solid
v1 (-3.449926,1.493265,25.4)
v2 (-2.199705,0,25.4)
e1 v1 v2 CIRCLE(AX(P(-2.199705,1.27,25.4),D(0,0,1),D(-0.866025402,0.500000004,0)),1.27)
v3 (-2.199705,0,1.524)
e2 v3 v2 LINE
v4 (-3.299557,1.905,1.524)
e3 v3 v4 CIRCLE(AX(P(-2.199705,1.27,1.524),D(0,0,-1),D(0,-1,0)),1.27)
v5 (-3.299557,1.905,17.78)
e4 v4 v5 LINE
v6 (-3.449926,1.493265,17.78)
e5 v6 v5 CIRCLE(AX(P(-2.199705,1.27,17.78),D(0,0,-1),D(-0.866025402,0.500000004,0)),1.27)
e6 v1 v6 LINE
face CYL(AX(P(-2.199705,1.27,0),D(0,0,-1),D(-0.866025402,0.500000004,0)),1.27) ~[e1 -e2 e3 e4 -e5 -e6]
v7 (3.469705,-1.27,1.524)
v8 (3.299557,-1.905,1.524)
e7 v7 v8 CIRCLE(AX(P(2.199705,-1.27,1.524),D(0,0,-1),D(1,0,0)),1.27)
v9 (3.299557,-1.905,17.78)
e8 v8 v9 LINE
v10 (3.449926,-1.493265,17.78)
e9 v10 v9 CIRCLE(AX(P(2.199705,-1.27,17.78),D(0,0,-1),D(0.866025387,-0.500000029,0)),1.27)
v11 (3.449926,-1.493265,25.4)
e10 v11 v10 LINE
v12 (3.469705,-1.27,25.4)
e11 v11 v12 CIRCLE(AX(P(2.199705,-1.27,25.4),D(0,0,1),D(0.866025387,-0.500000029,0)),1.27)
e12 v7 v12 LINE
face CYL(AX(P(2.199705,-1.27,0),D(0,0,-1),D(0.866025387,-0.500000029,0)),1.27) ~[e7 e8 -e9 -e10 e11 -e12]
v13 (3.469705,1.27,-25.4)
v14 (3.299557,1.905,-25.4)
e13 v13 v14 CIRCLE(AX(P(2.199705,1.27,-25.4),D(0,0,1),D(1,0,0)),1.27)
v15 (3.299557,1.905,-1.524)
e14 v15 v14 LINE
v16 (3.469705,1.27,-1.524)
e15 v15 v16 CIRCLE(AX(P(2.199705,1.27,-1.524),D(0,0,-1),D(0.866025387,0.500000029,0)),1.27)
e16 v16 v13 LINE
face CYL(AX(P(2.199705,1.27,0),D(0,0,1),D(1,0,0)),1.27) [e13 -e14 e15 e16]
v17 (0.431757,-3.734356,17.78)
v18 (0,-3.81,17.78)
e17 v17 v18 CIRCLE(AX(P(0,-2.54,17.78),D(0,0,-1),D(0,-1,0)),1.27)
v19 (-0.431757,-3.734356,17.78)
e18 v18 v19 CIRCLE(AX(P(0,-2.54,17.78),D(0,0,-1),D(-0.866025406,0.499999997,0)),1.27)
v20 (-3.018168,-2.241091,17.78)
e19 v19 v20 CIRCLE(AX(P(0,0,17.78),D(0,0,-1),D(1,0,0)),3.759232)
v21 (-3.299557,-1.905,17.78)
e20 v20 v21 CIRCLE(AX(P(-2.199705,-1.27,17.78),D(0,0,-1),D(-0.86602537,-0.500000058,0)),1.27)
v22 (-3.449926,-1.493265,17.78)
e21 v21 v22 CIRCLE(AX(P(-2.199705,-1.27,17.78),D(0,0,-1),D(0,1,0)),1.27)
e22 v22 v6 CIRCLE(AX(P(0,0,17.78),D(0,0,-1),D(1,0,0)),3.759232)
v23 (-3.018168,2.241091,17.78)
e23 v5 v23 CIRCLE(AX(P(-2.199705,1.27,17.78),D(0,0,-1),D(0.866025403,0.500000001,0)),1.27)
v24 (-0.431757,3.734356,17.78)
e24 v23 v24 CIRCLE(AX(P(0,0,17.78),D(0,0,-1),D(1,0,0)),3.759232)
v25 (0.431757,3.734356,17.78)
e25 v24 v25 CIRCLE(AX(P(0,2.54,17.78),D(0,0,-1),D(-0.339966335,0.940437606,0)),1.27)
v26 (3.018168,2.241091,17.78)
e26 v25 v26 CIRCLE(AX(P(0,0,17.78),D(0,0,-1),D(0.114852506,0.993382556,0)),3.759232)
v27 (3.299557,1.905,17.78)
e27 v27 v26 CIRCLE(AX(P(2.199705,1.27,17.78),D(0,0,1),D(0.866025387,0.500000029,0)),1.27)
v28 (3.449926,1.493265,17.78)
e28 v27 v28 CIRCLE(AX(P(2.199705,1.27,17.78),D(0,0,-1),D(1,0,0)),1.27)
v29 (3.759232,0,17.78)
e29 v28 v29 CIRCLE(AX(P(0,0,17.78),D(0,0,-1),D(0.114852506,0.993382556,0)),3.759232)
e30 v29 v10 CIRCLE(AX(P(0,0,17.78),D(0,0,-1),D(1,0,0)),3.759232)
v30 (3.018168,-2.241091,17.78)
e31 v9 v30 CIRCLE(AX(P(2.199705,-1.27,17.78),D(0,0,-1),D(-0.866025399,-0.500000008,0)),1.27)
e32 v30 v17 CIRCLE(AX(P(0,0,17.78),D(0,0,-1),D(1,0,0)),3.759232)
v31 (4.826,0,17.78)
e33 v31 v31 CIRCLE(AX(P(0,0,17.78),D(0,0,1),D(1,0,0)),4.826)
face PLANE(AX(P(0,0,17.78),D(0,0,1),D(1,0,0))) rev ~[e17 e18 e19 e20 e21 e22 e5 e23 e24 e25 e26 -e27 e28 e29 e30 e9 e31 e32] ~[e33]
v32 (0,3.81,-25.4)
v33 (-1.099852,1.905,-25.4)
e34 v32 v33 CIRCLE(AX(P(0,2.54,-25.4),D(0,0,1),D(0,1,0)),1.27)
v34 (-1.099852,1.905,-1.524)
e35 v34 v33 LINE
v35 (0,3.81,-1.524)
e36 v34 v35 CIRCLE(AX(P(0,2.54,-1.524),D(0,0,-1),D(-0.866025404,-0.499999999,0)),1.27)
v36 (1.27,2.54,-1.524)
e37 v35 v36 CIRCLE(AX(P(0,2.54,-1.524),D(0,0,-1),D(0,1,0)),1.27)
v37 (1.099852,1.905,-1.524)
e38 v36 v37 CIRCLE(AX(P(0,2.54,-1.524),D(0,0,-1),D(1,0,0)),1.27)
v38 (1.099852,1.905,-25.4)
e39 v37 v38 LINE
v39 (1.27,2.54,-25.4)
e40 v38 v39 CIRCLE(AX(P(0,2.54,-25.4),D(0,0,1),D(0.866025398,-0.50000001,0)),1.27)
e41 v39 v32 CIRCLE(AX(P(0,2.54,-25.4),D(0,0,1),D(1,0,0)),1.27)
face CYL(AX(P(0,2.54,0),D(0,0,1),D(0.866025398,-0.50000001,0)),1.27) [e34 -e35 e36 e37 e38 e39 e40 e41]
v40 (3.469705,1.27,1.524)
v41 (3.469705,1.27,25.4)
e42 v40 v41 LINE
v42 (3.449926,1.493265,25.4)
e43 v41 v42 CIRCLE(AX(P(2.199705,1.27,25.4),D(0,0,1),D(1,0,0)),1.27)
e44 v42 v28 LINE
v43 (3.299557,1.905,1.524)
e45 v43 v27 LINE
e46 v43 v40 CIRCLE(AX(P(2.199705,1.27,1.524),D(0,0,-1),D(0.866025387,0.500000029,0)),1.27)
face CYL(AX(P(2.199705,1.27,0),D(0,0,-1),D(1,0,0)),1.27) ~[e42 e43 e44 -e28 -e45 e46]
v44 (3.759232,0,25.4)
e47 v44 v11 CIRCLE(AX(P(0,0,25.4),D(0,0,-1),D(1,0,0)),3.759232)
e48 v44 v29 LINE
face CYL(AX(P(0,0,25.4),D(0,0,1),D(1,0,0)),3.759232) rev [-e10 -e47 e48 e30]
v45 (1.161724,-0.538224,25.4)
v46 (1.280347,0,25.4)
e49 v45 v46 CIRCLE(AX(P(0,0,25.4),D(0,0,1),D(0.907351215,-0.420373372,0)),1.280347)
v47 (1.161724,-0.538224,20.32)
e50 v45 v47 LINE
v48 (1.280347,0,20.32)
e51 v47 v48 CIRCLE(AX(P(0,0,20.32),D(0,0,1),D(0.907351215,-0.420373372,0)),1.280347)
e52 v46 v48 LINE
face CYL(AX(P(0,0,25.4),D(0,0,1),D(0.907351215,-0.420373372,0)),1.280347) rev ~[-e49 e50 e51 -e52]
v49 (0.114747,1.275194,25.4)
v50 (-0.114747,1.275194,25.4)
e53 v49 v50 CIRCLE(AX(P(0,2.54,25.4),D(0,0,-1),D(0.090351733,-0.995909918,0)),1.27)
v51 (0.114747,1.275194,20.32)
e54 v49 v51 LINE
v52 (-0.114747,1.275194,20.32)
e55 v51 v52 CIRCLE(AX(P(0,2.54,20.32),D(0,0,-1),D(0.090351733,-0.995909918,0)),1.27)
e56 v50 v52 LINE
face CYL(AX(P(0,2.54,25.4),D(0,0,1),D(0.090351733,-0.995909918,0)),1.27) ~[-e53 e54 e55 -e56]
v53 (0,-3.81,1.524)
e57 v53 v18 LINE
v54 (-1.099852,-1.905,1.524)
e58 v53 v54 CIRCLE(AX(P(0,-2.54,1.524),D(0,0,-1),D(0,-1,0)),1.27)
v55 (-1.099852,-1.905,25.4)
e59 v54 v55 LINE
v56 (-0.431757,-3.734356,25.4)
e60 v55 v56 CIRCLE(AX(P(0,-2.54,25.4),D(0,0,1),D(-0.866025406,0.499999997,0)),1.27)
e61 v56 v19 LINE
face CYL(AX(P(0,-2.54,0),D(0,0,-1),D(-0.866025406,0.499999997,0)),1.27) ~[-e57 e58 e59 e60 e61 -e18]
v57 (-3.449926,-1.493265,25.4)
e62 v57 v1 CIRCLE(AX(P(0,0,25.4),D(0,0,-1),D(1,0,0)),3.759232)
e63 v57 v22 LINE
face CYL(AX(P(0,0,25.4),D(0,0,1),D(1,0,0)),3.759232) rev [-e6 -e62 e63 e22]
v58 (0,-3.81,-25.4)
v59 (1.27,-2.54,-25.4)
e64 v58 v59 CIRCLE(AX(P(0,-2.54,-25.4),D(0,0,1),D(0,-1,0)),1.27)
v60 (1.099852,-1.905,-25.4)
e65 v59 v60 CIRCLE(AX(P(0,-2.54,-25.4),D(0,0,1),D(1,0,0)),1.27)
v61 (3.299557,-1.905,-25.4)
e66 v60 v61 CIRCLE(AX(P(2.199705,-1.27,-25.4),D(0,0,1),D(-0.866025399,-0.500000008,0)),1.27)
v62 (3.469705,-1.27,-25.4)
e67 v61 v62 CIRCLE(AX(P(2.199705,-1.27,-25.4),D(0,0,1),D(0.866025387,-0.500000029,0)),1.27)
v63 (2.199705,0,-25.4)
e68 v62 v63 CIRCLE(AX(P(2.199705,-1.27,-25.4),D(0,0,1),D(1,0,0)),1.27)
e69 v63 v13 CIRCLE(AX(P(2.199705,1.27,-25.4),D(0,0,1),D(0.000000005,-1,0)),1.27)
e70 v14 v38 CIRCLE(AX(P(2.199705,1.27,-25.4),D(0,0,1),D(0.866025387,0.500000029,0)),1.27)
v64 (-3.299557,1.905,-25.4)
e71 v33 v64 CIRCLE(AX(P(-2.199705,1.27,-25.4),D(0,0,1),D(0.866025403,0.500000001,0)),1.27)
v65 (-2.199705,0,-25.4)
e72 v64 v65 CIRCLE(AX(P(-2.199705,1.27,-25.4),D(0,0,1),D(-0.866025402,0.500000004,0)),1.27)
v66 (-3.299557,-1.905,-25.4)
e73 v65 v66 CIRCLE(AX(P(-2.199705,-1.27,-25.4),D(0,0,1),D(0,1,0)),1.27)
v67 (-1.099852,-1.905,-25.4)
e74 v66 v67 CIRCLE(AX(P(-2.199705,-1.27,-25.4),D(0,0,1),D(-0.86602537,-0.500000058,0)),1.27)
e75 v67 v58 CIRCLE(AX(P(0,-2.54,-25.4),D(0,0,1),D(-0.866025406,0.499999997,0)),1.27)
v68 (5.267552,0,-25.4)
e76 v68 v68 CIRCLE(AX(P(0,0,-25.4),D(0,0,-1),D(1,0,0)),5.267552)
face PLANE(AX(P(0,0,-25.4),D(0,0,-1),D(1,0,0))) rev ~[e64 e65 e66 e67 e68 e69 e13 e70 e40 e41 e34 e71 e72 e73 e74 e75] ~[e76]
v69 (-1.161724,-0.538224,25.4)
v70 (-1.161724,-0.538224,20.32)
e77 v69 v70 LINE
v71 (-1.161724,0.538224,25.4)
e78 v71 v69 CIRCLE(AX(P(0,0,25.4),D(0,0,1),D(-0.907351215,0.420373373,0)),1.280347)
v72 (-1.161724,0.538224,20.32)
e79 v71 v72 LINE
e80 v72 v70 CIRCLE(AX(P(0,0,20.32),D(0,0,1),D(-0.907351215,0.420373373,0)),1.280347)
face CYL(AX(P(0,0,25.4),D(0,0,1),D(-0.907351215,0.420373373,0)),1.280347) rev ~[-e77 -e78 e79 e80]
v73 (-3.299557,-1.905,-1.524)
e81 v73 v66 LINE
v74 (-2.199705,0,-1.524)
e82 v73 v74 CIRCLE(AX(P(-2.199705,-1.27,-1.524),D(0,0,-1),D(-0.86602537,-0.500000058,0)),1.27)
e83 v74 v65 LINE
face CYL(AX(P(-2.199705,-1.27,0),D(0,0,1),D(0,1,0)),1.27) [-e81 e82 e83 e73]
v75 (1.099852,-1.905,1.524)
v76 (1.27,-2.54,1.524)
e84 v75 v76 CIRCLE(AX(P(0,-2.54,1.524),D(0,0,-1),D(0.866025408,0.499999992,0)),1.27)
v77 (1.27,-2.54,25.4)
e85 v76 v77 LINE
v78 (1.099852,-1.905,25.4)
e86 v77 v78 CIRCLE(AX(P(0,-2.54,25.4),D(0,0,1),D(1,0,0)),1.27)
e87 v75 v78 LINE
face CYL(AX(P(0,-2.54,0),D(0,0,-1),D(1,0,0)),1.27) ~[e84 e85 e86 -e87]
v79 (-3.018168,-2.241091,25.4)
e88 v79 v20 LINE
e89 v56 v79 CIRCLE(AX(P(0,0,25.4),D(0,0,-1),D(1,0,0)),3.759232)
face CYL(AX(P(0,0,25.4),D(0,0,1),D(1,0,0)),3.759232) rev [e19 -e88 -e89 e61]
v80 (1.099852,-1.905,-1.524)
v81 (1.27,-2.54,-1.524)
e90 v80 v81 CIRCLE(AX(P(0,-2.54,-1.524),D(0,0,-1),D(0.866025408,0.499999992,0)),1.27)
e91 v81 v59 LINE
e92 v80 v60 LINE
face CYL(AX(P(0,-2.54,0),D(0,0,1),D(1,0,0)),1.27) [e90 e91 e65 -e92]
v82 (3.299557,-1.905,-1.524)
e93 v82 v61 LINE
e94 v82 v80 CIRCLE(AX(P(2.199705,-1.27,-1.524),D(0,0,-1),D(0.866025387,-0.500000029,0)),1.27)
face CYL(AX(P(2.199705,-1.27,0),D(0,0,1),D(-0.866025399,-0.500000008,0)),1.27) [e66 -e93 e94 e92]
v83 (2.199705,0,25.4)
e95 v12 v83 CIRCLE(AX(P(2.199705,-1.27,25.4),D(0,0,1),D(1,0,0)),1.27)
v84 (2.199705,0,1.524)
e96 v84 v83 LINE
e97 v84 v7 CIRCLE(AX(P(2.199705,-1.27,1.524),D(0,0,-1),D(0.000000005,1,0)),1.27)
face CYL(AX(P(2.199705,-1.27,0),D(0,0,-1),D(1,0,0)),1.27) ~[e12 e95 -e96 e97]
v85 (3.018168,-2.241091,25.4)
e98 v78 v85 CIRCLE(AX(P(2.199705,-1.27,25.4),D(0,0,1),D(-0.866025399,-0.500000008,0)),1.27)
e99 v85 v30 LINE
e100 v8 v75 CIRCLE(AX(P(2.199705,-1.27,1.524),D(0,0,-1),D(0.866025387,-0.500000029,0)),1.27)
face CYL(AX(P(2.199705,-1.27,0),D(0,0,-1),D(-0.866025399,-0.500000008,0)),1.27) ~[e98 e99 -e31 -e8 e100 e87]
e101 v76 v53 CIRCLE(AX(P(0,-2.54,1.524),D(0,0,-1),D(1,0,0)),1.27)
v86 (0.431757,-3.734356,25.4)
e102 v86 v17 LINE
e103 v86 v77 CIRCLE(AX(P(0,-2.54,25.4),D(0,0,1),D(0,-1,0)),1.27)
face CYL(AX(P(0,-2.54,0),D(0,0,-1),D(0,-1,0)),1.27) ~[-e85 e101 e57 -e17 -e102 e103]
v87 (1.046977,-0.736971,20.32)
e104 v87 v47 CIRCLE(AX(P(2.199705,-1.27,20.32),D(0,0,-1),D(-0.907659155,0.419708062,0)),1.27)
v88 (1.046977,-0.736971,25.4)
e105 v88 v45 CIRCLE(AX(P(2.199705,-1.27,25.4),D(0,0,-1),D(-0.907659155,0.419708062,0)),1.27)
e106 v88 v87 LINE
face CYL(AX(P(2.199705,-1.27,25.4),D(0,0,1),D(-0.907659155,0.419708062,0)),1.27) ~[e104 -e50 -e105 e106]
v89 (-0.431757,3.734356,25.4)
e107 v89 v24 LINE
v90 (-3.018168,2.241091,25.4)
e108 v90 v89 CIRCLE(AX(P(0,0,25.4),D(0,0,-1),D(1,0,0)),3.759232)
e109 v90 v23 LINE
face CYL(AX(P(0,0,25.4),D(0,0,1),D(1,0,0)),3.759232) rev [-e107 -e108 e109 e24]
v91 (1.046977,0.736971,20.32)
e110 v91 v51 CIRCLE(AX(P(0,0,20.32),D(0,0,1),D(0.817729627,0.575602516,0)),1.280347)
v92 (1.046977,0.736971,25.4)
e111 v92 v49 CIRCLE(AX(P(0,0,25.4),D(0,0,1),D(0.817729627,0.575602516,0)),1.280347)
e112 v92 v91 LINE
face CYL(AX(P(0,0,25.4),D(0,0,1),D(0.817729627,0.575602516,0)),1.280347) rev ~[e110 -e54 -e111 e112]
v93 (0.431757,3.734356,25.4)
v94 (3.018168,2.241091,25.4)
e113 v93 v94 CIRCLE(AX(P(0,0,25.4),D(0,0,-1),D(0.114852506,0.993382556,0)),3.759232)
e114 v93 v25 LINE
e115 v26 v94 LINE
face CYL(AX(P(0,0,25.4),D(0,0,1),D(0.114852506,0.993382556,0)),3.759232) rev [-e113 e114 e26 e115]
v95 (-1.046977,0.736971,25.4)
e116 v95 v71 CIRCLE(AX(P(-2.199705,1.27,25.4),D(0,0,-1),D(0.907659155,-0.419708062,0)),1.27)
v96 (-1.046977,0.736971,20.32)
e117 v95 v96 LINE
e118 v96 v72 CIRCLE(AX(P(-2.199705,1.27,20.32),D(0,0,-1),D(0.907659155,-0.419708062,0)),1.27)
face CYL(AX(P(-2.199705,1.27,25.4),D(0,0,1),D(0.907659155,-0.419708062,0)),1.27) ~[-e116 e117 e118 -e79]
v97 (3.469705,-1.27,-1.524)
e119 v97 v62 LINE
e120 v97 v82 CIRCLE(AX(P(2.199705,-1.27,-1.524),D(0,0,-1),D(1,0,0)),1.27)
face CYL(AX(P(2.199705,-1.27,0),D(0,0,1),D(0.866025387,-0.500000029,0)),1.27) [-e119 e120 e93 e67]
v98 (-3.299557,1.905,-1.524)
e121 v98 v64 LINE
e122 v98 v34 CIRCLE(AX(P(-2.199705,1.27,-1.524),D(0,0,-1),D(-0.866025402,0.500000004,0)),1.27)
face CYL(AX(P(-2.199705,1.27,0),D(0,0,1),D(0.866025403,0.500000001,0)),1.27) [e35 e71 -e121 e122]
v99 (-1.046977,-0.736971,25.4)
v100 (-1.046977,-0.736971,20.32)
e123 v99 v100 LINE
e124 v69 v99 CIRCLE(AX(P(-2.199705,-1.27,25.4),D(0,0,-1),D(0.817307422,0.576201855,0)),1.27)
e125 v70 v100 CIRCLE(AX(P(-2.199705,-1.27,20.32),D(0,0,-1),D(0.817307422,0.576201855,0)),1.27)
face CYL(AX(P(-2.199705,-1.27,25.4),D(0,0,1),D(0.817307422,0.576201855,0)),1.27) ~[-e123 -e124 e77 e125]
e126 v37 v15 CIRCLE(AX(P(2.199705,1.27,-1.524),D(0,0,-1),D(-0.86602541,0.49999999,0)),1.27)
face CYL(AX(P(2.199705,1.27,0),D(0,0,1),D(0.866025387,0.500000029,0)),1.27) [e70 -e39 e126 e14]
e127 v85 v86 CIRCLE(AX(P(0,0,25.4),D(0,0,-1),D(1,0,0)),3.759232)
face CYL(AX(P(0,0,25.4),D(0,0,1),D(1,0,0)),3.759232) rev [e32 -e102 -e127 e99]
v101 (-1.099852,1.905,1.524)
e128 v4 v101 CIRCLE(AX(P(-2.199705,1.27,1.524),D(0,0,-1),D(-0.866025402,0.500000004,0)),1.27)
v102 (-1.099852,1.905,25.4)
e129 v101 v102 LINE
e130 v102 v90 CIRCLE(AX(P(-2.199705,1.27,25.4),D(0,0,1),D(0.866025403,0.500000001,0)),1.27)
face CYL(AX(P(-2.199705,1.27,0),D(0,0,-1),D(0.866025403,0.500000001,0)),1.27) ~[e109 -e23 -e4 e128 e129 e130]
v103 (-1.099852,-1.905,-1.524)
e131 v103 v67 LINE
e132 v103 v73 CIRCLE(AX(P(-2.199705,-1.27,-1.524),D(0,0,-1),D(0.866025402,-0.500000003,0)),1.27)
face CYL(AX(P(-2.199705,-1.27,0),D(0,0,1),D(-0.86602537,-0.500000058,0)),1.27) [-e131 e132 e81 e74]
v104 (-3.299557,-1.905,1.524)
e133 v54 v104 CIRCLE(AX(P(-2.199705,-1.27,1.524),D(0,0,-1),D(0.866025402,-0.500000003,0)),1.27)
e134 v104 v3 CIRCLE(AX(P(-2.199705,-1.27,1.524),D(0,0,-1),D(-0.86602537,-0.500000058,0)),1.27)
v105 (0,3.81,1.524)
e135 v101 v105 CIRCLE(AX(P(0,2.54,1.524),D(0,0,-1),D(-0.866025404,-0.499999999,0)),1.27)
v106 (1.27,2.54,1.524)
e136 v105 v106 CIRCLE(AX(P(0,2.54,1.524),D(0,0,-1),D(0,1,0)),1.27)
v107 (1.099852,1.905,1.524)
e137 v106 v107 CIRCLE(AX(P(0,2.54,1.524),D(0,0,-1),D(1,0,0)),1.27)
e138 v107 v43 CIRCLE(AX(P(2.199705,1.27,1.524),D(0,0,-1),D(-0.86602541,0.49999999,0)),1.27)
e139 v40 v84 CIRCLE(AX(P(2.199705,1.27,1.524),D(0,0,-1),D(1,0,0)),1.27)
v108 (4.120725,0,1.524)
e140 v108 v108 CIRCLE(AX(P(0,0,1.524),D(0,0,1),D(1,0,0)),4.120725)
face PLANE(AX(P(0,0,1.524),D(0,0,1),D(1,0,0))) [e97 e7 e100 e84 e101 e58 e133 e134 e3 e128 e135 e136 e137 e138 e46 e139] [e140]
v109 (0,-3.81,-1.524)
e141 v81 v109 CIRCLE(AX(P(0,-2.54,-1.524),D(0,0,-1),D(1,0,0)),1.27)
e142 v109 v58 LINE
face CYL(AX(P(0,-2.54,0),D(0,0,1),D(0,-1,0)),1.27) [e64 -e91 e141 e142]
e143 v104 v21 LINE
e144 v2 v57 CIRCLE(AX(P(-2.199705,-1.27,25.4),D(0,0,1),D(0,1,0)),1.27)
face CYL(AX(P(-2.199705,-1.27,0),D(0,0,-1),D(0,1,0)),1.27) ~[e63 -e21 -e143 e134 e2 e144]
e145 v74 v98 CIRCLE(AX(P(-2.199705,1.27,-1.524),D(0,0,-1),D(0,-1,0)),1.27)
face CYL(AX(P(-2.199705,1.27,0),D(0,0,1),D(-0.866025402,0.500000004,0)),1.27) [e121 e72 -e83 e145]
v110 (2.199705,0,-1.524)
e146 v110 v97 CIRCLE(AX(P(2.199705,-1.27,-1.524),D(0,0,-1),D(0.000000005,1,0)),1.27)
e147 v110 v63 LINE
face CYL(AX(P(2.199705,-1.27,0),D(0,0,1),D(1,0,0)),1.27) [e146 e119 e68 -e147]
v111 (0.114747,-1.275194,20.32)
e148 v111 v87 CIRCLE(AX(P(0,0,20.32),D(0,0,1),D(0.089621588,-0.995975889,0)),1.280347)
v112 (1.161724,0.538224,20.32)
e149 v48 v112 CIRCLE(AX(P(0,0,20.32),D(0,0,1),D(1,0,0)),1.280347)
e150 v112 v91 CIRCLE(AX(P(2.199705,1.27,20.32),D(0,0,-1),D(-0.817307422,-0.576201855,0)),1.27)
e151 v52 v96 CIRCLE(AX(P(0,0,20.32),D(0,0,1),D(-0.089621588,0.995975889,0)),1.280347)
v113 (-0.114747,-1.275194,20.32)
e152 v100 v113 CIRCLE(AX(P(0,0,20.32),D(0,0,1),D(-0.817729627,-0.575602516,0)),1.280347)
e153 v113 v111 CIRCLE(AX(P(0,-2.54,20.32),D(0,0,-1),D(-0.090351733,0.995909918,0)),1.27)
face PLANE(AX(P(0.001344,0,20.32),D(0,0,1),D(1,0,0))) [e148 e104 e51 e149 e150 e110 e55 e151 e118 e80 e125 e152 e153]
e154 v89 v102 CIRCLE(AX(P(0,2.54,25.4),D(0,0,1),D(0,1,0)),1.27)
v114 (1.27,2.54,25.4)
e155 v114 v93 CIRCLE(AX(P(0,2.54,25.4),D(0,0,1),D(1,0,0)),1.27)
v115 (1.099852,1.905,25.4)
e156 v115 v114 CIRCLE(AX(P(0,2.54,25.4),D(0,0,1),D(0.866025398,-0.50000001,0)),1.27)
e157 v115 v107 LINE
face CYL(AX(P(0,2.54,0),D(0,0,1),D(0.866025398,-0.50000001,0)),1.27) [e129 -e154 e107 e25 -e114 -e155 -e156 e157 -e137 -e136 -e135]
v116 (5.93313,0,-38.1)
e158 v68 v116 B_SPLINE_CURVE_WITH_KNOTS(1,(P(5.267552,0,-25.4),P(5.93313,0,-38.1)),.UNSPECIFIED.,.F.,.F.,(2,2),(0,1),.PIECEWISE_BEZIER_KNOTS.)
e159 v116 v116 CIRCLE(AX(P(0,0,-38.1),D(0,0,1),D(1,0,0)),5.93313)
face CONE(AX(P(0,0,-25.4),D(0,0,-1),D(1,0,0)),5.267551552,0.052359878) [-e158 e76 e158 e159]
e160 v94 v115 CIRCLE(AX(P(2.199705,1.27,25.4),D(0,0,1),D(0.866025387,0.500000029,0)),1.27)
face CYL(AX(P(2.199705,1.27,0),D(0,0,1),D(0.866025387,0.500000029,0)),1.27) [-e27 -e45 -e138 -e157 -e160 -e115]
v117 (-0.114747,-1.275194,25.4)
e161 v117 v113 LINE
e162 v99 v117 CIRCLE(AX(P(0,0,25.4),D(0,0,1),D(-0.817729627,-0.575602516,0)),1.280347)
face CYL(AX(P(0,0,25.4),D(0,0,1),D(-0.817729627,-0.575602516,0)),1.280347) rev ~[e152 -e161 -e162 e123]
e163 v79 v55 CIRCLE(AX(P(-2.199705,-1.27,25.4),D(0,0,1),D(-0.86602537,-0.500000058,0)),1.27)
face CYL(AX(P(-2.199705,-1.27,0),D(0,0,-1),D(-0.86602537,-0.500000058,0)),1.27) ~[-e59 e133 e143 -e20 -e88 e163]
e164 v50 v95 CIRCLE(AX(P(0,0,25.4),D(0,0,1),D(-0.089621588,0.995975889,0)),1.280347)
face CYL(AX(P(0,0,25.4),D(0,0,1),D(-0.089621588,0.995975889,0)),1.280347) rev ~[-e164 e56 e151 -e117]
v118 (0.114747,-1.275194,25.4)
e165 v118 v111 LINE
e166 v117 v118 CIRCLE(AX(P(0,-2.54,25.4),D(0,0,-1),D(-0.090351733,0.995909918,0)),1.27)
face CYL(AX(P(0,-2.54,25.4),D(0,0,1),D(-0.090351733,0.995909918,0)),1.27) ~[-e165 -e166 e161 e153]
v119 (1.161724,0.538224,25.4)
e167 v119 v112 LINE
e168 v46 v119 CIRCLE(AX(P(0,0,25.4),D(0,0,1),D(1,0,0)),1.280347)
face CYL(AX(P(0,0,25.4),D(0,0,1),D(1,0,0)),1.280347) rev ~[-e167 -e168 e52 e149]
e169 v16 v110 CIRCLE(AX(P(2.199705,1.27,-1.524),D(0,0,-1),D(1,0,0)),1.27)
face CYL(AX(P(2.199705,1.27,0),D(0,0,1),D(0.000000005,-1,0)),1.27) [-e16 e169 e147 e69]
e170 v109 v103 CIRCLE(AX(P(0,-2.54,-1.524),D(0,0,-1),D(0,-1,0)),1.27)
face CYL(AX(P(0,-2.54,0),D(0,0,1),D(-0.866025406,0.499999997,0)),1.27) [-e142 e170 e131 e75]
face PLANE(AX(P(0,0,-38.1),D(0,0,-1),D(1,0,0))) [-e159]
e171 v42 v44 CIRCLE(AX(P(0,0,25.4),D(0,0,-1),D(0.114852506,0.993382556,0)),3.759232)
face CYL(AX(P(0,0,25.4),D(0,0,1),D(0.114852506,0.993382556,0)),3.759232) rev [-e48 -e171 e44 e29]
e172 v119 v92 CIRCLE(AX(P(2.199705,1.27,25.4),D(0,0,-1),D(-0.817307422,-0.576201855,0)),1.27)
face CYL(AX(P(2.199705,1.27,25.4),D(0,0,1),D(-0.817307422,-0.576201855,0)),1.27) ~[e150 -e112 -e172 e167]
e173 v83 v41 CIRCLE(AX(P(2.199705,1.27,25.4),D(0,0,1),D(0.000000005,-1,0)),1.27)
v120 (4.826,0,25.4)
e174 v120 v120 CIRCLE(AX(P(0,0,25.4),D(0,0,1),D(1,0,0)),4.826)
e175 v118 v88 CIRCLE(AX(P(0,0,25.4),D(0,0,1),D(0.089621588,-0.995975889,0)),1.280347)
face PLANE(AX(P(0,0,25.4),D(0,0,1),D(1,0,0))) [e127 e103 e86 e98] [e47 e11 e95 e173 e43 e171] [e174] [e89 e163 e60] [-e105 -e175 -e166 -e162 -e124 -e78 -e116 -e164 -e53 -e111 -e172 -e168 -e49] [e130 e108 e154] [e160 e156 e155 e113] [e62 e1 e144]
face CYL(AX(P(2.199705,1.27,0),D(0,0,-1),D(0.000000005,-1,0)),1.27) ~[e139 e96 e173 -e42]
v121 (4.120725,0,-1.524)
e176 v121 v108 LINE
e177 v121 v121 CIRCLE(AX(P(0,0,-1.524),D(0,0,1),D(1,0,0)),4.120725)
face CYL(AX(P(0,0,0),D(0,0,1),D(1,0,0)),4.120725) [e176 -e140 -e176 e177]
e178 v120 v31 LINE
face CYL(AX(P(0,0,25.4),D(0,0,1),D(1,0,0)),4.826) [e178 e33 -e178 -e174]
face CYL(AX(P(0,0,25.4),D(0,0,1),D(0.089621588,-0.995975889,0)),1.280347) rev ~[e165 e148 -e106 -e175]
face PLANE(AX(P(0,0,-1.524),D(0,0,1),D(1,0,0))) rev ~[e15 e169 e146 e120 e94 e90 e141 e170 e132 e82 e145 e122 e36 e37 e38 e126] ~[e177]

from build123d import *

# Parameters (mm, degrees)
F1_DEPTH = 25.4
F0_R     = 4.1207252188
F2_DEPTH = 1.524
F4_DEPTH = 5.08
F5_R     = 4.826
F6_DEPTH = 7.62
F8_R     = 5.2675515525
F9_DEPTH = 12.7
F9_TAPER = -3


with BuildPart() as f1:
    # F0 (on Top) → F1 (new body, symmetric)
    with BuildSketch(Plane.XY):
        with BuildLine():
            ThreePointArc((1.0998522687, -0.6349999897), (1.2267258009, -0.3287001815), (1.27, 0))
            ThreePointArc((1.27, 0), (1.2267257989, 0.328700189), (1.0998522611, 0.635000003))
            ThreePointArc((1.0998522611, 0.635000003), (0.6349999985, 1.0998522637), (0, 1.27))
            ThreePointArc((0, 1.27), (-0.6349999991, 1.0998522633), (-1.0998522618, 0.6350000018))
            ThreePointArc((-1.0998522618, 0.6350000018), (-1.27, 3.4e-09), (-1.0998522652, -0.6349999959))
            ThreePointArc((-1.0998522652, -0.6349999959), (-0.6350000021, -1.0998522616), (0, -1.27))
            ThreePointArc((0, -1.27), (0.6350000051, -1.0998522598), (1.0998522687, -0.6349999897))
        make_face()
        with BuildLine():
            ThreePointArc((-1.0998522618, 0.6350000018), (-0.6349999991, 1.0998522633), (0, 1.27))
            ThreePointArc((0, 1.27), (-0.6350000007, 1.4401477376), (-1.0998522636, 1.9050000014))
            ThreePointArc((-1.0998522636, 1.9050000014), (-0.9729787264, 1.5987001881), (-0.9297045256, 1.27))
            ThreePointArc((-0.9297045256, 1.27), (-0.972978726, 0.9412998137), (-1.0998522618, 0.6350000018))
        make_face()
        with BuildLine():
            ThreePointArc((0, 1.27), (0.6349999985, 1.0998522637), (1.0998522611, 0.635000003))
            ThreePointArc((1.0998522611, 0.635000003), (0.9297045256, 1.2699999943), (1.0998522553, 1.904999987))
            ThreePointArc((1.0998522553, 1.904999987), (0.6349999935, 1.4401477334), (0, 1.27))
        make_face()
        with BuildLine():
            ThreePointArc((1.0998522611, 0.635000003), (1.2267257989, 0.328700189), (1.27, 0))
            ThreePointArc((1.27, 0), (1.2267258009, -0.3287001815), (1.0998522687, -0.6349999897))
            ThreePointArc((1.0998522687, -0.6349999897), (1.5647045337, -0.1701477325), (2.1997045323, 0))
            ThreePointArc((2.1997045323, 0), (1.564704527, 0.1701477364), (1.0998522611, 0.635000003))
        make_face()
        with BuildLine():
            ThreePointArc((1.0998522687, -1.9050000103), (0.9297045256, -1.27), (1.0998522687, -0.6349999897))
            ThreePointArc((1.0998522687, -0.6349999897), (0.6350000051, -1.0998522598), (0, -1.27))
            ThreePointArc((0, -1.27), (0.6350000051, -1.4401477402), (1.0998522687, -1.9050000103))
        make_face()
        with BuildLine():
            ThreePointArc((-1.0998522652, -1.9050000041), (-0.635000002, -1.4401477384), (0, -1.27))
            ThreePointArc((0, -1.27), (-0.6350000021, -1.0998522616), (-1.0998522652, -0.6349999959))
            ThreePointArc((-1.0998522652, -0.6349999959), (-0.9729787268, -0.9412998104), (-0.9297045256, -1.27))
            ThreePointArc((-0.9297045256, -1.27), (-0.9729787268, -1.5987001896), (-1.0998522652, -1.9050000041))
        make_face()
        with BuildLine():
            ThreePointArc((-1.0998522652, -0.6349999959), (-1.27, 3.4e-09), (-1.0998522618, 0.6350000018))
            ThreePointArc((-1.0998522618, 0.6350000018), (-1.5647045247, 0.1701477377), (-2.1997045256, 0))
            ThreePointArc((-2.1997045256, 0), (-1.5647045277, -0.170147736), (-1.0998522652, -0.6349999959))
        make_face()
        with BuildLine():
            ThreePointArc((-1.0998522636, 1.9050000014), (-0.6350000007, 1.4401477376), (0, 1.27))
            ThreePointArc((0, 1.27), (0.6349999935, 1.4401477334), (1.0998522553, 1.904999987))
            ThreePointArc((1.0998522553, 1.904999987), (1.2267257974, 2.2112998055), (1.27, 2.54))
            ThreePointArc((1.27, 2.54), (0.8980256121, 3.4380256121), (0, 3.81))
            ThreePointArc((0, 3.81), (-1.0998522624, 3.1750000007), (-1.0998522636, 1.9050000014))
        make_face()
        with BuildLine():
            ThreePointArc((-2.1997045256, 0), (-1.5647045247, 0.1701477377), (-1.0998522618, 0.6350000018))
            ThreePointArc((-1.0998522618, 0.6350000018), (-0.972978726, 0.9412998137), (-0.9297045256, 1.27))
            ThreePointArc((-0.9297045256, 1.27), (-0.9729787264, 1.5987001881), (-1.0998522636, 1.9050000014))
            ThreePointArc((-1.0998522636, 1.9050000014), (-2.1997045238, 2.54), (-3.2995567858, 1.9050000045))
            ThreePointArc((-3.2995567858, 1.9050000045), (-3.2995567897, 0.6350000022), (-2.1997045256, 0))
        make_face()
        with BuildLine():
            ThreePointArc((-0.9297045256, -1.27), (-0.9729787268, -0.9412998104), (-1.0998522652, -0.6349999959))
            ThreePointArc((-1.0998522652, -0.6349999959), (-1.5647045277, -0.170147736), (-2.1997045256, 0))
            ThreePointArc((-2.1997045256, 0), (-3.2995568097, -0.6350000369), (-3.2995567458, -1.9050000739))
            ThreePointArc((-3.2995567458, -1.9050000739), (-2.1997044853, -2.54), (-1.0998522652, -1.9050000041))
            ThreePointArc((-1.0998522652, -1.9050000041), (-0.9729787268, -1.5987001896), (-0.9297045256, -1.27))
        make_face()
        with BuildLine():
            ThreePointArc((1.0998522687, -1.9050000103), (0.6350000051, -1.4401477402), (0, -1.27))
            ThreePointArc((0, -1.27), (-0.635000002, -1.4401477384), (-1.0998522652, -1.9050000041))
            ThreePointArc((-1.0998522652, -1.9050000041), (-1.0998522616, -3.175000002), (0, -3.81))
            ThreePointArc((0, -3.81), (0.8980256121, -3.4380256121), (1.27, -2.54))
            ThreePointArc((1.27, -2.54), (1.2267258009, -2.2112998185), (1.0998522687, -1.9050000103))
        make_face()
        with BuildLine():
            ThreePointArc((2.1997045323, 0), (1.5647045337, -0.1701477325), (1.0998522687, -0.6349999897))
            ThreePointArc((1.0998522687, -0.6349999897), (0.9297045256, -1.27), (1.0998522687, -1.9050000103))
            ThreePointArc((1.0998522687, -1.9050000103), (2.1997045101, -2.54), (3.299556767, -1.9050000371))
            ThreePointArc((3.299556767, -1.9050000371), (3.4264303195, -1.598700208), (3.4697045256, -1.27))
            ThreePointArc((3.4697045256, -1.27), (3.0977301401, -0.3719743903), (2.1997045323, 0))
        make_face()
        with BuildLine():
            ThreePointArc((1.0998522553, 1.904999987), (0.9297045256, 1.2699999943), (1.0998522611, 0.635000003))
            ThreePointArc((1.0998522611, 0.635000003), (1.564704527, 0.1701477364), (2.1997045323, 0))
            ThreePointArc((2.1997045323, 0), (3.0977301401, 0.3719743903), (3.4697045256, 1.27))
            ThreePointArc((3.4697045256, 1.27), (3.4264303195, 1.598700208), (3.299556767, 1.9050000371))
            ThreePointArc((3.299556767, 1.9050000371), (2.1997044967, 2.54), (1.0998522553, 1.904999987))
        make_face()
    extrude(amount=F1_DEPTH, both=True)

    # F0 (on Top) → F2 (join, symmetric)
    with BuildSketch(Plane.XY):
        Circle(F0_R)
        with BuildLine():
            ThreePointArc((0, 3.81), (1.9049999814, 3.2995567991), (3.299556767, 1.9050000371))
            ThreePointArc((3.299556767, 1.9050000371), (3.6801773926, 0.9861005825), (3.81, 0))
            ThreePointArc((3.81, 0), (3.6801773926, -0.9861005825), (3.299556767, -1.9050000371))
            ThreePointArc((3.299556767, -1.9050000371), (1.9049999814, -3.2995567991), (0, -3.81))
            ThreePointArc((0, -3.81), (-1.9049999631, -3.2995568097), (-3.2995567458, -1.9050000739))
            ThreePointArc((-3.2995567458, -1.9050000739), (-3.81, -4.01e-08), (-3.2995567858, 1.9050000045))
            ThreePointArc((-3.2995567858, 1.9050000045), (-1.9049999978, 3.2995567897), (0, 3.81))
        make_face(mode=Mode.SUBTRACT)
        with BuildLine():
            ThreePointArc((-3.2995567858, 1.9050000045), (-2.1997045238, 2.54), (-1.0998522636, 1.9050000014))
            ThreePointArc((-1.0998522636, 1.9050000014), (-1.0998522624, 3.1750000007), (0, 3.81))
            ThreePointArc((0, 3.81), (-1.9049999978, 3.2995567897), (-3.2995567858, 1.9050000045))
        make_face()
        with BuildLine():
            ThreePointArc((1.27, 2.54), (1.2267257974, 2.2112998055), (1.0998522553, 1.904999987))
            ThreePointArc((1.0998522553, 1.904999987), (2.1997044967, 2.54), (3.299556767, 1.9050000371))
            ThreePointArc((3.299556767, 1.9050000371), (1.9049999814, 3.2995567991), (0, 3.81))
            ThreePointArc((0, 3.81), (0.8980256121, 3.4380256121), (1.27, 2.54))
        make_face()
        with BuildLine():
            ThreePointArc((3.4697045256, 1.27), (3.0977301401, 0.3719743903), (2.1997045323, 0))
            ThreePointArc((2.1997045323, 0), (3.0977301401, -0.3719743903), (3.4697045256, -1.27))
            ThreePointArc((3.4697045256, -1.27), (3.4264303195, -1.598700208), (3.299556767, -1.9050000371))
            ThreePointArc((3.299556767, -1.9050000371), (3.6801773926, -0.9861005825), (3.81, 0))
            ThreePointArc((3.81, 0), (3.6801773926, 0.9861005825), (3.299556767, 1.9050000371))
            ThreePointArc((3.299556767, 1.9050000371), (3.4264303195, 1.598700208), (3.4697045256, 1.27))
        make_face()
        with BuildLine():
            ThreePointArc((3.299556767, -1.9050000371), (2.1997045101, -2.54), (1.0998522687, -1.9050000103))
            ThreePointArc((1.0998522687, -1.9050000103), (1.2267258009, -2.2112998185), (1.27, -2.54))
            ThreePointArc((1.27, -2.54), (0.8980256121, -3.4380256121), (0, -3.81))
            ThreePointArc((0, -3.81), (1.9049999814, -3.2995567991), (3.299556767, -1.9050000371))
        make_face()
        with BuildLine():
            ThreePointArc((0, -3.81), (-1.0998522616, -3.175000002), (-1.0998522652, -1.9050000041))
            ThreePointArc((-1.0998522652, -1.9050000041), (-2.1997044853, -2.54), (-3.2995567458, -1.9050000739))
            ThreePointArc((-3.2995567458, -1.9050000739), (-1.9049999631, -3.2995568097), (0, -3.81))
        make_face()
        with BuildLine():
            ThreePointArc((-3.2995567458, -1.9050000739), (-3.2995568097, -0.6350000369), (-2.1997045256, 0))
            ThreePointArc((-2.1997045256, 0), (-3.2995567897, 0.6350000022), (-3.2995567858, 1.9050000045))
            ThreePointArc((-3.2995567858, 1.9050000045), (-3.81, -4.01e-08), (-3.2995567458, -1.9050000739))
        make_face()
    extrude(amount=F2_DEPTH, both=True)

    # F3 (on face) → F4 (cut)
    with BuildSketch(Plane.XY.offset(25.4)):
        with BuildLine():
            ThreePointArc((1.1617240994, -0.5382236443), (1.2503393833, -0.2755703193), (1.2803466618, 0))
            ThreePointArc((1.2803466618, 0), (1.2503393833, 0.2755703193), (1.1617240994, 0.5382236443))
            ThreePointArc((1.1617240994, 0.5382236443), (1.0998522628, 0.635), (1.0469773986, 0.7369707601))
            ThreePointArc((1.0469773986, 0.7369707601), (0.6401733309, 1.1088127348), (0.1147467008, 1.2751944044))
            ThreePointArc((0.1147467008, 1.2751944044), (0, 1.27), (-0.1147467008, 1.2751944044))
            ThreePointArc((-0.1147467008, 1.2751944044), (-0.6401733309, 1.1088127348), (-1.0469773986, 0.7369707601))
            ThreePointArc((-1.0469773986, 0.7369707601), (-1.0998522628, 0.635), (-1.1617240994, 0.5382236443))
            ThreePointArc((-1.1617240994, 0.5382236443), (-1.2803466618, 0), (-1.1617240994, -0.5382236443))
            ThreePointArc((-1.1617240994, -0.5382236443), (-1.0998522628, -0.635), (-1.0469773986, -0.7369707601))
            ThreePointArc((-1.0469773986, -0.7369707601), (-0.6401733309, -1.1088127348), (-0.1147467008, -1.2751944044))
            ThreePointArc((-0.1147467008, -1.2751944044), (0, -1.27), (0.1147467008, -1.2751944044))
            ThreePointArc((0.1147467008, -1.2751944044), (0.6401733309, -1.1088127348), (1.0469773986, -0.7369707601))
            ThreePointArc((1.0469773986, -0.7369707601), (1.0998522628, -0.635), (1.1617240994, -0.5382236443))
        make_face()
    extrude(amount=-F4_DEPTH, mode=Mode.SUBTRACT)

    # F5 (on face) → F6 (join)
    with BuildSketch(Plane.XY.offset(25.4)):
        Circle(F5_R)
        with BuildLine():
            ThreePointArc((0.4317572455, 3.7343557598), (2.8066798027, 2.5008749959), (3.75923227, 0))
            ThreePointArc((3.75923227, 0), (-2.5008749959, -2.8066798027), (-0.4317572455, 3.7343557598))
            ThreePointArc((-0.4317572455, 3.7343557598), (0, 3.81), (0.4317572455, 3.7343557598))
        make_face(mode=Mode.SUBTRACT)
    extrude(amount=-F6_DEPTH)

    # F8 (on offset) → F9 (join)
    with BuildSketch(Plane(origin=(0, 0, -25.4), x_dir=(1, 0, 0), z_dir=(0, 0, -1))):
        Circle(F8_R)
    extrude(amount=F9_DEPTH, taper=F9_TAPER)


solid = f1.part
